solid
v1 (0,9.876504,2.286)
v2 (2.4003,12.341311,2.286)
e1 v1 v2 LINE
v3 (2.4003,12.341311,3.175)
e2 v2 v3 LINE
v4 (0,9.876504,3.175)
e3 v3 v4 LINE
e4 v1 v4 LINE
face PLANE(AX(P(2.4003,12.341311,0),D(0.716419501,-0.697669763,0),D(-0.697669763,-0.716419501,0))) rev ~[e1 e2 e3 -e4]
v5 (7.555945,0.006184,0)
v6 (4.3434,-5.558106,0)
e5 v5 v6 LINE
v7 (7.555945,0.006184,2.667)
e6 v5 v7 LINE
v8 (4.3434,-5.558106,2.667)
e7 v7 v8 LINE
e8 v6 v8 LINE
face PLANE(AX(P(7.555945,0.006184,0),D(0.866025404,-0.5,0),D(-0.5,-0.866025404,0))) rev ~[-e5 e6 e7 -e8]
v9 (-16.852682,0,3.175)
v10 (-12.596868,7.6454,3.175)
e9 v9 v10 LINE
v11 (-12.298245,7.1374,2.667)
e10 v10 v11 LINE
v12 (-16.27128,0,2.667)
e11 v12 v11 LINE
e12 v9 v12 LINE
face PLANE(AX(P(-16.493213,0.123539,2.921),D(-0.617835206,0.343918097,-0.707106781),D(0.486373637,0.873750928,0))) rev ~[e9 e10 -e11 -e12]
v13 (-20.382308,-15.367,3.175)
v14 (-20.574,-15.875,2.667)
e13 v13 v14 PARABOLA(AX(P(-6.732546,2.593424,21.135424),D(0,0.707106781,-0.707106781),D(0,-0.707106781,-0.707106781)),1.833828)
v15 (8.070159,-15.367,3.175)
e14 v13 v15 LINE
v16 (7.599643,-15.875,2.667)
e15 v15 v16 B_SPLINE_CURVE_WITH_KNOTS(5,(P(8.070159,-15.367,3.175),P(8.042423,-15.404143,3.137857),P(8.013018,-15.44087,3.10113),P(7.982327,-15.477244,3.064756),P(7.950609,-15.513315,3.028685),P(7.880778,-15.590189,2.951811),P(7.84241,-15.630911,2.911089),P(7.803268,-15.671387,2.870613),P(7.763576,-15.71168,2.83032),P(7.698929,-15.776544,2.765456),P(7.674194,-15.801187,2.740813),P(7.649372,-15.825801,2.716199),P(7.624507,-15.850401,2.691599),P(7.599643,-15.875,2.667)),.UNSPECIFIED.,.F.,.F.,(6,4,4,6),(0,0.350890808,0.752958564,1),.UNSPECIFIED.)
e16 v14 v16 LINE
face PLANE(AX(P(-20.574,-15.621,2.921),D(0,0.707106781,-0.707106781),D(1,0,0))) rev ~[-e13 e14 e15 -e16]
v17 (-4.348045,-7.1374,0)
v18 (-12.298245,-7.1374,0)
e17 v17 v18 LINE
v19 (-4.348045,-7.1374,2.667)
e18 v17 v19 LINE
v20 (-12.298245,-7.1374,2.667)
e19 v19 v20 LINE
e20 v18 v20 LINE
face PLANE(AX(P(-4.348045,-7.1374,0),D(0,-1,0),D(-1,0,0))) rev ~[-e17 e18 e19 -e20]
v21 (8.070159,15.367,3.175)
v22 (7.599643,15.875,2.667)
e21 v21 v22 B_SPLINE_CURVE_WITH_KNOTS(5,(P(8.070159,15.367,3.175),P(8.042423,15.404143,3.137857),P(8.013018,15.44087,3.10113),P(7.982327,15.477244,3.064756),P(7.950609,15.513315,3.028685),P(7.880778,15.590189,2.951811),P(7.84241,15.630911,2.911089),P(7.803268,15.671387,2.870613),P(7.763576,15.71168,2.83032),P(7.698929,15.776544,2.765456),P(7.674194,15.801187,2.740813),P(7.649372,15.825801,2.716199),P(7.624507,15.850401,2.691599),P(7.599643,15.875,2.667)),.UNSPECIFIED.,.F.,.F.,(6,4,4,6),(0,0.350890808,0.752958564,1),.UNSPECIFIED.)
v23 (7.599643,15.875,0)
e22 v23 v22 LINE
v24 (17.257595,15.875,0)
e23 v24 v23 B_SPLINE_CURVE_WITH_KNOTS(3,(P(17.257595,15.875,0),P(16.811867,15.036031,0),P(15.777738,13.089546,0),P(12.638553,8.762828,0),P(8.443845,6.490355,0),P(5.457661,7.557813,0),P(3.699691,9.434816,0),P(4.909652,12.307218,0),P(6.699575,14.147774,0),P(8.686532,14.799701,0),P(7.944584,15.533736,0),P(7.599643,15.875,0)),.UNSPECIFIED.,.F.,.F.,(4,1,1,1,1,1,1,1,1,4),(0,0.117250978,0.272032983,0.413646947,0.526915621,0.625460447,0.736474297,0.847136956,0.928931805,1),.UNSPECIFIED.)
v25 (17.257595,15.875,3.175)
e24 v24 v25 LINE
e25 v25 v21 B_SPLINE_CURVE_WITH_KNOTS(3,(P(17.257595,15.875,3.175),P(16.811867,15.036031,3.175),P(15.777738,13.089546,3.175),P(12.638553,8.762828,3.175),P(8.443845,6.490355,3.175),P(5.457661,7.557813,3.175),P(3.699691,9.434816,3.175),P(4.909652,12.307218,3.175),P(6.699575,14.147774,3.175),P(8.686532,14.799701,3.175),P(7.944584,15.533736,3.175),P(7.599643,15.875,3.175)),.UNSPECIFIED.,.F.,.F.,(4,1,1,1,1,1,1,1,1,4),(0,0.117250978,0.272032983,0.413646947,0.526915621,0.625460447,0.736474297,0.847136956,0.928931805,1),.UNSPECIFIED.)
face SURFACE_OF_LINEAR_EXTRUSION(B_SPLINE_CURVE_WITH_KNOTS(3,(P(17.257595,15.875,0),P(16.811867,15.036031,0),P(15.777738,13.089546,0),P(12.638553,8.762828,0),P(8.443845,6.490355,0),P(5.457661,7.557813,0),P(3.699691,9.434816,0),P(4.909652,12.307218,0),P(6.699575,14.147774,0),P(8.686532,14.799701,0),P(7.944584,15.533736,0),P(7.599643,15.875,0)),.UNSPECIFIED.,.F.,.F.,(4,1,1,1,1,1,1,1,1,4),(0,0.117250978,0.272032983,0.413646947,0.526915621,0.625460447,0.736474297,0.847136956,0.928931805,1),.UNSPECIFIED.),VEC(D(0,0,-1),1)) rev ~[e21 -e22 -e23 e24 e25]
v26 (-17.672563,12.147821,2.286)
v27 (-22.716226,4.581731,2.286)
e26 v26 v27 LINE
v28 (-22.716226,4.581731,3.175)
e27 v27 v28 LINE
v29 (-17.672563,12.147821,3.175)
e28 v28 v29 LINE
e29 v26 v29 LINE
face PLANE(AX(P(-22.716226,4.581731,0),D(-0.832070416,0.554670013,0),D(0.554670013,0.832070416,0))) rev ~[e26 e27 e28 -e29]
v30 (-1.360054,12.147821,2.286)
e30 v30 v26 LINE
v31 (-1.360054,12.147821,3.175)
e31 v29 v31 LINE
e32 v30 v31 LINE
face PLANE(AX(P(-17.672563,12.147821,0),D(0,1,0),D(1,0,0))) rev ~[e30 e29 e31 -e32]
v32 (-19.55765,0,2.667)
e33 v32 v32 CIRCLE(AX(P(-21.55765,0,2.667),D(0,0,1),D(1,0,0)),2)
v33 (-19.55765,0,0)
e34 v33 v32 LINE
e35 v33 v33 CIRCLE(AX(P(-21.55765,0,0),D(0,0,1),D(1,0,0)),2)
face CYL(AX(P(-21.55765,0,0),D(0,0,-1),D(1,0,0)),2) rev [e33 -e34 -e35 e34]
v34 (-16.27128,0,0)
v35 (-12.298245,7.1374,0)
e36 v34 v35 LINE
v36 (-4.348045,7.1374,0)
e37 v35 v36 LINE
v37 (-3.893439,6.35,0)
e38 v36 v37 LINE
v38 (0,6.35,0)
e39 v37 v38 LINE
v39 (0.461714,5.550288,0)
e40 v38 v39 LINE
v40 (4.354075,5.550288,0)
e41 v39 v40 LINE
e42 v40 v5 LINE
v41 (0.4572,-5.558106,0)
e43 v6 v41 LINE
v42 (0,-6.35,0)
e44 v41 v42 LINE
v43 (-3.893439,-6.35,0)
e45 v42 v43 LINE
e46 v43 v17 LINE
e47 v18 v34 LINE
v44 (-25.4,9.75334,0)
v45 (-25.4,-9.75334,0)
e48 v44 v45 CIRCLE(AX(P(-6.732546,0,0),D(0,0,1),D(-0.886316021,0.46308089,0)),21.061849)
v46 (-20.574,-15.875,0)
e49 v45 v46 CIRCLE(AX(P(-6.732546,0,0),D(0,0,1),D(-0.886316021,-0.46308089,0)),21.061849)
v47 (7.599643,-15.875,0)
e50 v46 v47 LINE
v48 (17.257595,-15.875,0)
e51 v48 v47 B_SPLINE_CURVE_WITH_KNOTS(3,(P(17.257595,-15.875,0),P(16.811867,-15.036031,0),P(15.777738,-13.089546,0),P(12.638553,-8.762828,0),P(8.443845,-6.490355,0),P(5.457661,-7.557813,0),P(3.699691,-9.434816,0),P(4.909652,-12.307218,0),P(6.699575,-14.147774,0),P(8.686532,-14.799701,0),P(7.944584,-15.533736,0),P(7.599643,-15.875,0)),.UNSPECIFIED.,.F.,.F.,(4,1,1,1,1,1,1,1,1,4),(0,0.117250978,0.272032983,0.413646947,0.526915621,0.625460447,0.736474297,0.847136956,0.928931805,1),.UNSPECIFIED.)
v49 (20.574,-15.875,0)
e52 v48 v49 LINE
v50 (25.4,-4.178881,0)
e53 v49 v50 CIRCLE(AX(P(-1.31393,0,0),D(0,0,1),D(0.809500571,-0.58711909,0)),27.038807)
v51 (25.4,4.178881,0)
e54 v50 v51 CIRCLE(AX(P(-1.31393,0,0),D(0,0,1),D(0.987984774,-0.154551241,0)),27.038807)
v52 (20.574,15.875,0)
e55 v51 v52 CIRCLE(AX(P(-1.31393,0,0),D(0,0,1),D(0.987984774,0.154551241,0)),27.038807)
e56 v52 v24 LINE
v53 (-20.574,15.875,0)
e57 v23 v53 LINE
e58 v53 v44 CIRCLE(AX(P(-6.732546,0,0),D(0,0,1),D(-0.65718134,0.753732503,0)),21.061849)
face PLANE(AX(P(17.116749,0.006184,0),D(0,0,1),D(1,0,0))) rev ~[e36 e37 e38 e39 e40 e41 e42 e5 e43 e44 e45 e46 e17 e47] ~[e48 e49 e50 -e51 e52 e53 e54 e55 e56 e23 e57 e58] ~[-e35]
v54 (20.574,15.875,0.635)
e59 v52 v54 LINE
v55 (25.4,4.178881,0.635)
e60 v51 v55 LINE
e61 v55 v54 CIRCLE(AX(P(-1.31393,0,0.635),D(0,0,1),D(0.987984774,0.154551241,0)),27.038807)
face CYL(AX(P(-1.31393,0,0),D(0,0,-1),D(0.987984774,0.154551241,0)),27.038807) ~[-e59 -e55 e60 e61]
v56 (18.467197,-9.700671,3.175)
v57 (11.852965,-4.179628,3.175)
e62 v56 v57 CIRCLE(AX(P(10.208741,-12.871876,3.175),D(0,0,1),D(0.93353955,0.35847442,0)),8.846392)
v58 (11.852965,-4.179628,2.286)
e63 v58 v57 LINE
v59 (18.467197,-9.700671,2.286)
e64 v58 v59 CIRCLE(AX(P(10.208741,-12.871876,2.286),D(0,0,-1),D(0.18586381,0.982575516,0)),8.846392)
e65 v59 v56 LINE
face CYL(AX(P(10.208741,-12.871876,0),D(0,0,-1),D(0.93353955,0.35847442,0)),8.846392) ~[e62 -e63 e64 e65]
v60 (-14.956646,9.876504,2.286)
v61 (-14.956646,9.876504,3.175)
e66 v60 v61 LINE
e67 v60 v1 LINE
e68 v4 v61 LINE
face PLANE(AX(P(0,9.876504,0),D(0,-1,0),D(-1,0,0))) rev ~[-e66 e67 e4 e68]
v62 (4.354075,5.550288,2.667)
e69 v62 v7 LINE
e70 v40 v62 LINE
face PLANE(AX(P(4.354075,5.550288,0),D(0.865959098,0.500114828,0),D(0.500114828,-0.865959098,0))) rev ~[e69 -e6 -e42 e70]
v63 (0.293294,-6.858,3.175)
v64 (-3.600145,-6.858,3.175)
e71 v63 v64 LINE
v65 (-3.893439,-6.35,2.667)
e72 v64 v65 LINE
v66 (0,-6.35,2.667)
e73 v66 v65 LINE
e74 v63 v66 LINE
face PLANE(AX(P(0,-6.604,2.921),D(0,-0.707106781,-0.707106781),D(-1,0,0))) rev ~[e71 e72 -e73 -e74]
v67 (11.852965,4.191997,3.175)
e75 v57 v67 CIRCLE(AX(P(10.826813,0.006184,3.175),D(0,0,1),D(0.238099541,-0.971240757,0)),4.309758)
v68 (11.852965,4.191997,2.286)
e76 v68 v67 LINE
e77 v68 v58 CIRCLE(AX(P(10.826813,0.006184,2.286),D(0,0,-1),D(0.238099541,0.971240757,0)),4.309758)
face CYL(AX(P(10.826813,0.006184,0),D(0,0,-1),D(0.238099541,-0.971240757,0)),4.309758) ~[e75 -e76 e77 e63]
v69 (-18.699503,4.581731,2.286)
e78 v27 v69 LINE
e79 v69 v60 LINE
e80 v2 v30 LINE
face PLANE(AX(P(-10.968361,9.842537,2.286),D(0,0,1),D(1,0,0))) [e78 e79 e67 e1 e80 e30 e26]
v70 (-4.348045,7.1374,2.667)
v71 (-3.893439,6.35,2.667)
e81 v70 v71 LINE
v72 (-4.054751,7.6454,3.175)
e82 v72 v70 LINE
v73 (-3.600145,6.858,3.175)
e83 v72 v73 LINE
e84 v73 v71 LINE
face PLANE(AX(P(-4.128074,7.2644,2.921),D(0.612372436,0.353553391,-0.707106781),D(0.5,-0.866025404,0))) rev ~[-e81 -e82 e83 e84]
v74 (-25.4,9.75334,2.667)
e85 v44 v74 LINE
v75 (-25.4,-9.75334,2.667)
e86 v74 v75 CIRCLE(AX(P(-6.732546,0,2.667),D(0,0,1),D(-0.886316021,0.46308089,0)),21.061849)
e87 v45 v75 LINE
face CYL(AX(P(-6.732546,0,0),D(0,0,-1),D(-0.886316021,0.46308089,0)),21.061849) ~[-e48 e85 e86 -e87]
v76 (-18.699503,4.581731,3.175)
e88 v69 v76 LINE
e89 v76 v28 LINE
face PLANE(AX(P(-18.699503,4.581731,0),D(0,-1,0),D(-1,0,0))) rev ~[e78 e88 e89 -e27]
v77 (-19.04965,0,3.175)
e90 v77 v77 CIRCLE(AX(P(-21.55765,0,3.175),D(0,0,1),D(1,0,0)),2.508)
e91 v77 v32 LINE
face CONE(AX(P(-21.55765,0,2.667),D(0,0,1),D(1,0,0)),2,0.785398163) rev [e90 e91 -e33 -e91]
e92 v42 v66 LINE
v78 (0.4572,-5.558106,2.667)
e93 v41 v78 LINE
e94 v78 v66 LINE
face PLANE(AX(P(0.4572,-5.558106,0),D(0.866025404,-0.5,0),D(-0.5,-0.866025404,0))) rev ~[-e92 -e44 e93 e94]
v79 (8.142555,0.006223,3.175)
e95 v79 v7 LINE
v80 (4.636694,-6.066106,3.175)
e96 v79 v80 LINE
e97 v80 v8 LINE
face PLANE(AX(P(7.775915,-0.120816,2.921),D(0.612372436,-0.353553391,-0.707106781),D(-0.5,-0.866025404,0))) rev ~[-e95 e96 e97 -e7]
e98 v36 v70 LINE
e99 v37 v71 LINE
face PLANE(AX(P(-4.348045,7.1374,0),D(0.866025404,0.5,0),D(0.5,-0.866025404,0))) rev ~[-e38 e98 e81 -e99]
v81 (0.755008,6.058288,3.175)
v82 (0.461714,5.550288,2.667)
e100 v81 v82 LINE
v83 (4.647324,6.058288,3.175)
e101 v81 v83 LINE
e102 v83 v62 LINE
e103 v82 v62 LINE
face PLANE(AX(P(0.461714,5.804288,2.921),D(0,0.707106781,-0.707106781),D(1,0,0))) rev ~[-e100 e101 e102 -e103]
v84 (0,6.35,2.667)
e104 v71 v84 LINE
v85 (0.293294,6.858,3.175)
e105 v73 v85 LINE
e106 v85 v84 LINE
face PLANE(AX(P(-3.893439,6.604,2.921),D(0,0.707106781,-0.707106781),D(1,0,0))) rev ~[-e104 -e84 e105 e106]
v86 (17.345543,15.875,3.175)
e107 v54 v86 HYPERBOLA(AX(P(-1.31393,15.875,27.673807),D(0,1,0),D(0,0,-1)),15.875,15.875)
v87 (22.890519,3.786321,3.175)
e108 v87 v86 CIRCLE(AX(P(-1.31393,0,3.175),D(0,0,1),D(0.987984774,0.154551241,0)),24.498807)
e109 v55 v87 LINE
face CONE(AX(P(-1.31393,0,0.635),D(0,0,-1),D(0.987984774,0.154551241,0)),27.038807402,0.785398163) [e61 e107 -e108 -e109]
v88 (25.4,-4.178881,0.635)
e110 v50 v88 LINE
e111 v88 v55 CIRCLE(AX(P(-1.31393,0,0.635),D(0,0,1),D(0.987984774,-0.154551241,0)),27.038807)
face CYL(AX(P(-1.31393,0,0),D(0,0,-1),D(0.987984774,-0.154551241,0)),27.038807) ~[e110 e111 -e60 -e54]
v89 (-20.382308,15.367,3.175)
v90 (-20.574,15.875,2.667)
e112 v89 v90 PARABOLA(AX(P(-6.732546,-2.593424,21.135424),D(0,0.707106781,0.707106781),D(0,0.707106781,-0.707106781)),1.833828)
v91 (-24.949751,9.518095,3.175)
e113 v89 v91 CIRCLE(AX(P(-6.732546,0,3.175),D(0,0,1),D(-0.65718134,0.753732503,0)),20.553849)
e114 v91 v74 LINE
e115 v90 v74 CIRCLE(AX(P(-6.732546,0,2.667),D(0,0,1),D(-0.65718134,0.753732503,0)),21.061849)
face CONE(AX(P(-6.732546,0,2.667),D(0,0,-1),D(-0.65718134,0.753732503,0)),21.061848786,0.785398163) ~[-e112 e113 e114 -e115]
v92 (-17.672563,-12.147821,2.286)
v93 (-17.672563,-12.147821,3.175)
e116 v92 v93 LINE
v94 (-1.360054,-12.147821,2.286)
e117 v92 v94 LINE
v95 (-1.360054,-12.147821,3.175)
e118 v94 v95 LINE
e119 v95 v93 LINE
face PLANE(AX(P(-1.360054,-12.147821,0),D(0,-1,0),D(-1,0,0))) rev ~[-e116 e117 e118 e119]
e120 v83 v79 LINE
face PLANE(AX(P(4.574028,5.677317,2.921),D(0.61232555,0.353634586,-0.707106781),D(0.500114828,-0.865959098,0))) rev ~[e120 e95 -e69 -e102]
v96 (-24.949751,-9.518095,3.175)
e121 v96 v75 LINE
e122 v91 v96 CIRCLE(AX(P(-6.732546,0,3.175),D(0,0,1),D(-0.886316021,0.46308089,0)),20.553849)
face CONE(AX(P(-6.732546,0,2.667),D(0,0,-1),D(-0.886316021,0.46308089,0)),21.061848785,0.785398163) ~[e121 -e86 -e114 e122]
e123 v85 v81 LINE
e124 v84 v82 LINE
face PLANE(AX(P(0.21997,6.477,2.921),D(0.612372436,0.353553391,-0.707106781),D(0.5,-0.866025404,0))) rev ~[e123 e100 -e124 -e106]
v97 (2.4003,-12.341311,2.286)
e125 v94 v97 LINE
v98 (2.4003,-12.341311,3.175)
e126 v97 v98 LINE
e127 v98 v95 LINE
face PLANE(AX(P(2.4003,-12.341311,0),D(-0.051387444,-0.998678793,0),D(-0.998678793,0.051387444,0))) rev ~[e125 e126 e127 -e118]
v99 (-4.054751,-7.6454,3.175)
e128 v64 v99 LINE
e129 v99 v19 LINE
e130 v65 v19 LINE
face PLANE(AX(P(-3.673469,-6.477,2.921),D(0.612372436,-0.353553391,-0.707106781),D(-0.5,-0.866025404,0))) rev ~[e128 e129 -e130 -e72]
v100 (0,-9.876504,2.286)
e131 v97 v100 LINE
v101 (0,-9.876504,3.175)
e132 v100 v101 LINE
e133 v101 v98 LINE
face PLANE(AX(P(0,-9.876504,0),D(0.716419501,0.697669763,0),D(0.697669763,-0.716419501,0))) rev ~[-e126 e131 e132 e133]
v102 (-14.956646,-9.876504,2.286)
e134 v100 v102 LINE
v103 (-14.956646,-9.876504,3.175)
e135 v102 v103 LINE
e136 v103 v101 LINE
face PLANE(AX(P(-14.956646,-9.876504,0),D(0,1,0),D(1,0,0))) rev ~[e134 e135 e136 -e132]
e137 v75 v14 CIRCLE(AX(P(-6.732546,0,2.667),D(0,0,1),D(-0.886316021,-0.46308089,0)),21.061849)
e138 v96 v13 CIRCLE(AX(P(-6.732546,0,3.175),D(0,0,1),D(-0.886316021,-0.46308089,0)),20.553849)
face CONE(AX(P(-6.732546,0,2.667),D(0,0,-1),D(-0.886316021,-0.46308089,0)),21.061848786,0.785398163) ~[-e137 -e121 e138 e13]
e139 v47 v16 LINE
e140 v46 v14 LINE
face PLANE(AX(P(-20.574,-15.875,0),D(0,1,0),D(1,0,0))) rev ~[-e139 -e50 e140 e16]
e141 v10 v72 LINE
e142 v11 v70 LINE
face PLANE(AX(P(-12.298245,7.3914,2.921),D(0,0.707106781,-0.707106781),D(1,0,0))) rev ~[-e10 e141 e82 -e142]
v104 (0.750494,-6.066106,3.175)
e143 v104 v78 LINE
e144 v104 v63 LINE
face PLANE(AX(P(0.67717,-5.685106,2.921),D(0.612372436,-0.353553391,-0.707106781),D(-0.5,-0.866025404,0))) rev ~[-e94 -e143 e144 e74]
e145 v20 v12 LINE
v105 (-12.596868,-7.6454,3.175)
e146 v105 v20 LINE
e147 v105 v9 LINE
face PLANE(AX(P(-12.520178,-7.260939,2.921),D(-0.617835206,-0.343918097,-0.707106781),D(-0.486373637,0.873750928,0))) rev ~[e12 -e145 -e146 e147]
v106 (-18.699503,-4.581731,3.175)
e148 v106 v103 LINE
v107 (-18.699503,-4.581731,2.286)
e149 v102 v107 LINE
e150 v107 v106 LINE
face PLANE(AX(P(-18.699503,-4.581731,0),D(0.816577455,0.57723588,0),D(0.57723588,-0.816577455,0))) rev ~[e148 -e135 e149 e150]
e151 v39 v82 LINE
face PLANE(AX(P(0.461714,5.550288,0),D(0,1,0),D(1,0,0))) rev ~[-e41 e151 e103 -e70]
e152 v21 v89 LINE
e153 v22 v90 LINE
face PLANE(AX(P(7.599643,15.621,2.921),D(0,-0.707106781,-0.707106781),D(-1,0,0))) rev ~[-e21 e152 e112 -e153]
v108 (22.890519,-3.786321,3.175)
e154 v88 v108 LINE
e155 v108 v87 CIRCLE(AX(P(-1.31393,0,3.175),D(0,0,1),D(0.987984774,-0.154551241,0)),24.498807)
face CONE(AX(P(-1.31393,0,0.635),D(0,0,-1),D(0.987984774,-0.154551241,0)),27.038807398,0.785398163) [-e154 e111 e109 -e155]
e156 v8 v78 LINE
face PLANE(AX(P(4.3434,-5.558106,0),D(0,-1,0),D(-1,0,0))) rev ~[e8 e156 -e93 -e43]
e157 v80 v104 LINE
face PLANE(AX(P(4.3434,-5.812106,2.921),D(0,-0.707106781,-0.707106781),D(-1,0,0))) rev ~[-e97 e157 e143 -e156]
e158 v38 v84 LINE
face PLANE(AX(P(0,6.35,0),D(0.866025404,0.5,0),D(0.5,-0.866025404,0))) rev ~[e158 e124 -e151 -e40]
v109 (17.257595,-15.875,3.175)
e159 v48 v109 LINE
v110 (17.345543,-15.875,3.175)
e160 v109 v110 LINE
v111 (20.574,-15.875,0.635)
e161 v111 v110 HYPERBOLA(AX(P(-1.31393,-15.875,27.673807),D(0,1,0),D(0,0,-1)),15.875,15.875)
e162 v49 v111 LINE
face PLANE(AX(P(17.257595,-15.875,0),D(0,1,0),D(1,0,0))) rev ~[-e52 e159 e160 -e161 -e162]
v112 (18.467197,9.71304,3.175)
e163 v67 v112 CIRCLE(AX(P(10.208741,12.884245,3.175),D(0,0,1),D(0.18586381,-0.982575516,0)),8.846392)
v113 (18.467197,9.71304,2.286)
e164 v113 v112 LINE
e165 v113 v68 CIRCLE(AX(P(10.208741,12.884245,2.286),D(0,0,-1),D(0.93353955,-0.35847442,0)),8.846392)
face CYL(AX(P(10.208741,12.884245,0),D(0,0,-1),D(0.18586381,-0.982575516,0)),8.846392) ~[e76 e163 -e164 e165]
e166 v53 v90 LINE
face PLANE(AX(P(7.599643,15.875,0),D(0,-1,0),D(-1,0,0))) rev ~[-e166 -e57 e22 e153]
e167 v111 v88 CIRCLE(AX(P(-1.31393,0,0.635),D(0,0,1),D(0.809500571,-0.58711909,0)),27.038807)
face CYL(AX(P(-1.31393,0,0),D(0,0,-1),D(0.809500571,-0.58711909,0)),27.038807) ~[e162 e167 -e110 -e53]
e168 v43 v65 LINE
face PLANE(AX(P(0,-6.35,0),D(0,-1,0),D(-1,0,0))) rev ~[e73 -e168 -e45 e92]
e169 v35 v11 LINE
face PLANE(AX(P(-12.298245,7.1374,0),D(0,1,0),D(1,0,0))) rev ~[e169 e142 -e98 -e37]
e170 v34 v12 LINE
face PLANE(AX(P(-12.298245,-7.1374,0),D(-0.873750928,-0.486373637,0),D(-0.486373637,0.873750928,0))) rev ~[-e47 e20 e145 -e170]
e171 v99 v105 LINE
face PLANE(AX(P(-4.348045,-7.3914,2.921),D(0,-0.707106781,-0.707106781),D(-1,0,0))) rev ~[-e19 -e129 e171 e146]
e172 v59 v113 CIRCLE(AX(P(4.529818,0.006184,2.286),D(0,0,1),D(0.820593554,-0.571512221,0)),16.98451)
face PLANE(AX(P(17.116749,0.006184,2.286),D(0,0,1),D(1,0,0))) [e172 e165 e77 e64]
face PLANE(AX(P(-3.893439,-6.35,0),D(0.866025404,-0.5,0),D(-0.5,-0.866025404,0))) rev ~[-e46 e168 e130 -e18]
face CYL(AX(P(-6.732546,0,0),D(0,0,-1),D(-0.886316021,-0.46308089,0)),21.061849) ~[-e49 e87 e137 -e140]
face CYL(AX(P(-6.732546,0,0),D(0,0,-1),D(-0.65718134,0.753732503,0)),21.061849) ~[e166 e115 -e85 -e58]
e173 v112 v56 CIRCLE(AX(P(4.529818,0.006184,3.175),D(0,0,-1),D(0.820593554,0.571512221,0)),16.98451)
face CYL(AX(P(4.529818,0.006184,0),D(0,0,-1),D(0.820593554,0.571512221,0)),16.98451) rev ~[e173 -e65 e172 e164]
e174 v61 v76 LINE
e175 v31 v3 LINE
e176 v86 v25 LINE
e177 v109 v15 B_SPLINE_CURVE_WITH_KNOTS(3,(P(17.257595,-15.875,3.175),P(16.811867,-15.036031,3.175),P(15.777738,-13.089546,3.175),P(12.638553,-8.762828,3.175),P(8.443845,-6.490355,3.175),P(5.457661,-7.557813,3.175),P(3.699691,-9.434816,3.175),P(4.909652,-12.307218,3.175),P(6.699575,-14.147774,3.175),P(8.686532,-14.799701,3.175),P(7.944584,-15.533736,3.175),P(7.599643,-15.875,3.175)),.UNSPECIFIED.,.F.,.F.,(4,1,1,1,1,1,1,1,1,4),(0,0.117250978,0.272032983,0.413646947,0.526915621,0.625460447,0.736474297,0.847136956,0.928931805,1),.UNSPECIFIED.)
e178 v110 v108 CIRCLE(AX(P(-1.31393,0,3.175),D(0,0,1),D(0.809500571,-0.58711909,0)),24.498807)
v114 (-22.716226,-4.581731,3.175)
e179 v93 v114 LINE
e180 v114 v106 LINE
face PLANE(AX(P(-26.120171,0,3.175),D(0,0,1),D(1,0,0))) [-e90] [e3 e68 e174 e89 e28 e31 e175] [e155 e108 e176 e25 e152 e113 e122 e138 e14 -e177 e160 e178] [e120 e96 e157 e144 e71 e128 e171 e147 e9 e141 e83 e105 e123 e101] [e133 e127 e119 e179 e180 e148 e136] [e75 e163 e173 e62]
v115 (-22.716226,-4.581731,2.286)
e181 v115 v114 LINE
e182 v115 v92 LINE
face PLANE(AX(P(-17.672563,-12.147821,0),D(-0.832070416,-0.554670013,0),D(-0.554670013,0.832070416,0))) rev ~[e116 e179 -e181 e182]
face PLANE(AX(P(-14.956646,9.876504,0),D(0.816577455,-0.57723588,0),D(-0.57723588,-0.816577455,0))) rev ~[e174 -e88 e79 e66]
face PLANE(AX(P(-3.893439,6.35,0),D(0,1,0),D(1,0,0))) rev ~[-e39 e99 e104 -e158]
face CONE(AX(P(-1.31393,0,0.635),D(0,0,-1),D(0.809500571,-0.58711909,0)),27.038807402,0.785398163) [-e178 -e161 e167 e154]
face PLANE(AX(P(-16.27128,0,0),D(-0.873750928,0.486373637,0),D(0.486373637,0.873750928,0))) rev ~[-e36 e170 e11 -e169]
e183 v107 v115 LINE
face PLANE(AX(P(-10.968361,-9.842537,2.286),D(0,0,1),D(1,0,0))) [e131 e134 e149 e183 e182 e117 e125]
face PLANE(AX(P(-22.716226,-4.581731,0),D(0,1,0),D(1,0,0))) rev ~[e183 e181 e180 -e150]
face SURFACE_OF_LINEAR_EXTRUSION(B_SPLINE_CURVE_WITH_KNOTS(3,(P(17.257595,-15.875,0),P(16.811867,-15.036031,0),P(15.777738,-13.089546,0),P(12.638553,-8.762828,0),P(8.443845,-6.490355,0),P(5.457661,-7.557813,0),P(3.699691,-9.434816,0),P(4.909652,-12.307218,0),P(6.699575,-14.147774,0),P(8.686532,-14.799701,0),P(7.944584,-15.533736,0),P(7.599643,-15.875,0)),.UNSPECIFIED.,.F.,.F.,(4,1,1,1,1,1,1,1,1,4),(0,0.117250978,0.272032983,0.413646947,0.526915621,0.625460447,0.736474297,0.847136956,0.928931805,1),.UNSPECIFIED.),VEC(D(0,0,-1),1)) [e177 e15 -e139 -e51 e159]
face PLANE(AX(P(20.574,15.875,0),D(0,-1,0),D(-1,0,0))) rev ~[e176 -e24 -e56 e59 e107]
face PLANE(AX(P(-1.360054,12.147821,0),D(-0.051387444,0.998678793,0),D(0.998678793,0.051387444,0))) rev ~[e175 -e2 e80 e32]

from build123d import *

# Parameters (mm, degrees)
F0_R     = 2
F1_DEPTH = 3.175
F2_SIZE2 = 2.54
F2_SIZE  = 2.54
F3_SIZE  = 0.508
F4_DEPTH = 2.286
F5_DEPTH = 2.286


# Not quite as in the source:
# - a feature names something its author has since deleted; it is built from what else it names


with BuildPart() as f1:
    # F0 (on Top) → F1 (new body)
    with BuildSketch(Plane.XY):
        with BuildLine():
            Line((-25.4, -9.7533396771), (-25.4, 9.7533396771))
            ThreePointArc((-25.4, 9.7533396771), (-27.7943947705, 0), (-25.4, -9.7533396771))
        make_face()
        with BuildLine():
            Line((7.5996425003, 15.875), (-20.574, 15.875))
            ThreePointArc((-20.574, 15.875), (-23.2726776835, 13.0393833309), (-25.4, 9.7533396771))
            Line((-25.4, 9.7533396771), (-25.4, -9.7533396771))
            ThreePointArc((-25.4, -9.7533396771), (-23.2726776835, -13.0393833309), (-20.574, -15.875))
            Line((-20.574, -15.875), (7.5996425003, -15.875))
            add(Edge.make_bspline(
                [(17.2575954348, -15.875), (16.8118674755, -15.0360308318), (15.7777378861, -13.0895457095), (12.6385533239, -8.7628284751), (8.4438454096, -6.4903546022), (5.4576611574, -7.5578133093), (3.6996913649, -9.434816458), (4.9096520026, -12.30721807), (6.6995754798, -14.1477736043), (8.6865320781, -14.7997007485), (7.9445844593, -15.5337364181), (7.5996425003, -15.875)],
                knots=[0, 0, 0, 0, 0.1172509784, 0.2720329825, 0.4136469471, 0.5269156212, 0.6254604471, 0.7364742974, 0.8471369559, 0.9289318052, 1, 1, 1, 1], degree=3))
            Line((17.2575954348, -15.875), (19.5524021983, -15.875))
            ThreePointArc((19.5524021983, -15.875), (24.535980368, 0), (19.5524021983, 15.875))
            Line((19.5524021983, 15.875), (17.2575954348, 15.875))
            add(Edge.make_bspline(
                [(17.2575954348, 15.875), (16.8118674755, 15.0360308318), (15.7777378861, 13.0895457095), (12.6385533239, 8.7628284751), (8.4438454096, 6.4903546022), (5.4576611574, 7.5578133093), (3.6996913649, 9.434816458), (4.9096520026, 12.30721807), (6.6995754798, 14.1477736043), (8.6865320781, 14.7997007485), (7.9445844593, 15.5337364181), (7.5996425003, 15.875)],
                knots=[0, 0, 0, 0, 0.1172509784, 0.2720329825, 0.4136469471, 0.5269156212, 0.6254604471, 0.7364742974, 0.8471369559, 0.9289318052, 1, 1, 1, 1], degree=3))
        make_face()
        Polygon((0, -9.8765036091), (2.4003, -12.3413112015), (-1.3600544771, -12.1478205547), (-17.6725629717, -12.1478205547), (-22.7162260562, -4.5817312784), (-18.6995025724, -4.5817312784), (-14.9566456676, -9.8765036091), align=None, mode=Mode.SUBTRACT)
        with Locations((-21.5576495975, 0)):
            Circle(F0_R, mode=Mode.SUBTRACT)
        Polygon((-16.2712801248, 0), (-12.2982449182, 7.1374), (-4.3480449182, 7.1374), (-3.8934393163, 6.35), (0, 6.35), (0.4617137668, 5.5502882974), (4.3540745974, 5.5502882974), (7.5559447504, 0.0061843585), (4.3434, -5.5581063708), (0.4572, -5.5581063708), (0, -6.35), (-3.8934393163, -6.35), (-4.3480449182, -7.1374), (-12.2982449182, -7.1374), align=None, mode=Mode.SUBTRACT)
        Polygon((-14.9566456676, 9.8765036091), (-18.6995025724, 4.5817312784), (-22.7162260562, 4.5817312784), (-17.6725629717, 12.1478205547), (-1.3600544771, 12.1478205547), (2.4003, 12.3413112015), (0, 9.8765036091), align=None, mode=Mode.SUBTRACT)
        with BuildLine():
            ThreePointArc((18.4671971947, -9.7006708384), (15.8776249613, -6.080528756), (11.8529647589, -4.1796281002))
            ThreePointArc((11.8529647589, -4.1796281002), (15.1365712278, 0.0061843585), (11.8529647589, 4.1919968173))
            ThreePointArc((11.8529647589, 4.1919968173), (15.8776249613, 6.092897473), (18.4671971947, 9.7130395554))
            ThreePointArc((18.4671971947, 9.7130395554), (21.5143278197, 0.0061843585), (18.4671971947, -9.7006708384))
        make_face(mode=Mode.SUBTRACT)
        with BuildLine():
            ThreePointArc((25.4, -4.1788812389), (25.7248773783, 0), (25.4, 4.1788812389))
            Line((25.4, 4.1788812389), (25.4, -4.1788812389))
        make_face()
        with BuildLine():
            Line((20.574, 15.875), (19.5524021983, 15.875))
            ThreePointArc((19.5524021983, 15.875), (24.535980368, 0), (19.5524021983, -15.875))
            Line((19.5524021983, -15.875), (20.574, -15.875))
            ThreePointArc((20.574, -15.875), (23.6807693851, -10.3132006276), (25.4, -4.1788812389))
            Line((25.4, -4.1788812389), (25.4, 4.1788812389))
            ThreePointArc((25.4, 4.1788812389), (23.6807693851, 10.3132006276), (20.574, 15.875))
        make_face()
    extrude(amount=F1_DEPTH)

    # F2
    f2_edges = [f1.edges().sort_by_distance(p)[0] for p in [
        (25.724877, 0, 3.175),
    ]]
    chamfer(f2_edges, length=F2_SIZE, length2=F2_SIZE2)

    # F3
    f3_edges = [f1.edges().sort_by_distance(p)[0] for p in [
        (-23.55765, 0, 3.175),
        (-14.284763, 3.5687, 3.175),
        (-14.284763, -3.5687, 3.175),
        (-8.323145, -7.1374, 3.175),
        (-8.323145, 7.1374, 3.175),
        (-4.120742, -6.7437, 3.175),
        (-1.94672, -6.35, 3.175),
        (0.2286, -5.954053, 3.175),
        (2.4003, -5.558106, 3.175),
        (5.949672, -2.775961, 3.175),
        (5.95501, 2.778236, 3.175),
        (-4.120742, 6.7437, 3.175),
        (-1.94672, 6.35, 3.175),
        (0.230857, 5.950144, 3.175),
        (2.407894, 5.550288, 3.175),
        (-6.487179, 15.875, 3.175),
        (-27.794395, 0, 3.175),
        (-6.487179, -15.875, 3.175),
    ]]
    chamfer(f3_edges, length=F3_SIZE)

    # F0 (on Top) → F4 (join)
    with BuildSketch(Plane.XY):
        Polygon((-1.3600544771, -12.1478205547), (2.4003, -12.3413112015), (0, -9.8765036091), (-14.9566456676, -9.8765036091), (-18.6995025724, -4.5817312784), (-22.7162260562, -4.5817312784), (-17.6725629717, -12.1478205547), align=None)
        Polygon((-22.7162260562, 4.5817312784), (-18.6995025724, 4.5817312784), (-14.9566456676, 9.8765036091), (0, 9.8765036091), (2.4003, 12.3413112015), (-1.3600544771, 12.1478205547), (-17.6725629717, 12.1478205547), align=None)
    extrude(amount=F4_DEPTH)

    # F0 (on Top) → F5 (join)
    with BuildSketch(Plane.XY):
        with BuildLine():
            ThreePointArc((11.8529647589, 4.1919968173), (15.1365712278, 0.0061843585), (11.8529647589, -4.1796281002))
            ThreePointArc((11.8529647589, -4.1796281002), (15.8776249613, -6.080528756), (18.4671971947, -9.7006708384))
            ThreePointArc((18.4671971947, -9.7006708384), (21.5143278197, 0.0061843585), (18.4671971947, 9.7130395554))
            ThreePointArc((18.4671971947, 9.7130395554), (15.8776249613, 6.092897473), (11.8529647589, 4.1919968173))
        make_face()
    extrude(amount=F5_DEPTH)


solid = f1.part
